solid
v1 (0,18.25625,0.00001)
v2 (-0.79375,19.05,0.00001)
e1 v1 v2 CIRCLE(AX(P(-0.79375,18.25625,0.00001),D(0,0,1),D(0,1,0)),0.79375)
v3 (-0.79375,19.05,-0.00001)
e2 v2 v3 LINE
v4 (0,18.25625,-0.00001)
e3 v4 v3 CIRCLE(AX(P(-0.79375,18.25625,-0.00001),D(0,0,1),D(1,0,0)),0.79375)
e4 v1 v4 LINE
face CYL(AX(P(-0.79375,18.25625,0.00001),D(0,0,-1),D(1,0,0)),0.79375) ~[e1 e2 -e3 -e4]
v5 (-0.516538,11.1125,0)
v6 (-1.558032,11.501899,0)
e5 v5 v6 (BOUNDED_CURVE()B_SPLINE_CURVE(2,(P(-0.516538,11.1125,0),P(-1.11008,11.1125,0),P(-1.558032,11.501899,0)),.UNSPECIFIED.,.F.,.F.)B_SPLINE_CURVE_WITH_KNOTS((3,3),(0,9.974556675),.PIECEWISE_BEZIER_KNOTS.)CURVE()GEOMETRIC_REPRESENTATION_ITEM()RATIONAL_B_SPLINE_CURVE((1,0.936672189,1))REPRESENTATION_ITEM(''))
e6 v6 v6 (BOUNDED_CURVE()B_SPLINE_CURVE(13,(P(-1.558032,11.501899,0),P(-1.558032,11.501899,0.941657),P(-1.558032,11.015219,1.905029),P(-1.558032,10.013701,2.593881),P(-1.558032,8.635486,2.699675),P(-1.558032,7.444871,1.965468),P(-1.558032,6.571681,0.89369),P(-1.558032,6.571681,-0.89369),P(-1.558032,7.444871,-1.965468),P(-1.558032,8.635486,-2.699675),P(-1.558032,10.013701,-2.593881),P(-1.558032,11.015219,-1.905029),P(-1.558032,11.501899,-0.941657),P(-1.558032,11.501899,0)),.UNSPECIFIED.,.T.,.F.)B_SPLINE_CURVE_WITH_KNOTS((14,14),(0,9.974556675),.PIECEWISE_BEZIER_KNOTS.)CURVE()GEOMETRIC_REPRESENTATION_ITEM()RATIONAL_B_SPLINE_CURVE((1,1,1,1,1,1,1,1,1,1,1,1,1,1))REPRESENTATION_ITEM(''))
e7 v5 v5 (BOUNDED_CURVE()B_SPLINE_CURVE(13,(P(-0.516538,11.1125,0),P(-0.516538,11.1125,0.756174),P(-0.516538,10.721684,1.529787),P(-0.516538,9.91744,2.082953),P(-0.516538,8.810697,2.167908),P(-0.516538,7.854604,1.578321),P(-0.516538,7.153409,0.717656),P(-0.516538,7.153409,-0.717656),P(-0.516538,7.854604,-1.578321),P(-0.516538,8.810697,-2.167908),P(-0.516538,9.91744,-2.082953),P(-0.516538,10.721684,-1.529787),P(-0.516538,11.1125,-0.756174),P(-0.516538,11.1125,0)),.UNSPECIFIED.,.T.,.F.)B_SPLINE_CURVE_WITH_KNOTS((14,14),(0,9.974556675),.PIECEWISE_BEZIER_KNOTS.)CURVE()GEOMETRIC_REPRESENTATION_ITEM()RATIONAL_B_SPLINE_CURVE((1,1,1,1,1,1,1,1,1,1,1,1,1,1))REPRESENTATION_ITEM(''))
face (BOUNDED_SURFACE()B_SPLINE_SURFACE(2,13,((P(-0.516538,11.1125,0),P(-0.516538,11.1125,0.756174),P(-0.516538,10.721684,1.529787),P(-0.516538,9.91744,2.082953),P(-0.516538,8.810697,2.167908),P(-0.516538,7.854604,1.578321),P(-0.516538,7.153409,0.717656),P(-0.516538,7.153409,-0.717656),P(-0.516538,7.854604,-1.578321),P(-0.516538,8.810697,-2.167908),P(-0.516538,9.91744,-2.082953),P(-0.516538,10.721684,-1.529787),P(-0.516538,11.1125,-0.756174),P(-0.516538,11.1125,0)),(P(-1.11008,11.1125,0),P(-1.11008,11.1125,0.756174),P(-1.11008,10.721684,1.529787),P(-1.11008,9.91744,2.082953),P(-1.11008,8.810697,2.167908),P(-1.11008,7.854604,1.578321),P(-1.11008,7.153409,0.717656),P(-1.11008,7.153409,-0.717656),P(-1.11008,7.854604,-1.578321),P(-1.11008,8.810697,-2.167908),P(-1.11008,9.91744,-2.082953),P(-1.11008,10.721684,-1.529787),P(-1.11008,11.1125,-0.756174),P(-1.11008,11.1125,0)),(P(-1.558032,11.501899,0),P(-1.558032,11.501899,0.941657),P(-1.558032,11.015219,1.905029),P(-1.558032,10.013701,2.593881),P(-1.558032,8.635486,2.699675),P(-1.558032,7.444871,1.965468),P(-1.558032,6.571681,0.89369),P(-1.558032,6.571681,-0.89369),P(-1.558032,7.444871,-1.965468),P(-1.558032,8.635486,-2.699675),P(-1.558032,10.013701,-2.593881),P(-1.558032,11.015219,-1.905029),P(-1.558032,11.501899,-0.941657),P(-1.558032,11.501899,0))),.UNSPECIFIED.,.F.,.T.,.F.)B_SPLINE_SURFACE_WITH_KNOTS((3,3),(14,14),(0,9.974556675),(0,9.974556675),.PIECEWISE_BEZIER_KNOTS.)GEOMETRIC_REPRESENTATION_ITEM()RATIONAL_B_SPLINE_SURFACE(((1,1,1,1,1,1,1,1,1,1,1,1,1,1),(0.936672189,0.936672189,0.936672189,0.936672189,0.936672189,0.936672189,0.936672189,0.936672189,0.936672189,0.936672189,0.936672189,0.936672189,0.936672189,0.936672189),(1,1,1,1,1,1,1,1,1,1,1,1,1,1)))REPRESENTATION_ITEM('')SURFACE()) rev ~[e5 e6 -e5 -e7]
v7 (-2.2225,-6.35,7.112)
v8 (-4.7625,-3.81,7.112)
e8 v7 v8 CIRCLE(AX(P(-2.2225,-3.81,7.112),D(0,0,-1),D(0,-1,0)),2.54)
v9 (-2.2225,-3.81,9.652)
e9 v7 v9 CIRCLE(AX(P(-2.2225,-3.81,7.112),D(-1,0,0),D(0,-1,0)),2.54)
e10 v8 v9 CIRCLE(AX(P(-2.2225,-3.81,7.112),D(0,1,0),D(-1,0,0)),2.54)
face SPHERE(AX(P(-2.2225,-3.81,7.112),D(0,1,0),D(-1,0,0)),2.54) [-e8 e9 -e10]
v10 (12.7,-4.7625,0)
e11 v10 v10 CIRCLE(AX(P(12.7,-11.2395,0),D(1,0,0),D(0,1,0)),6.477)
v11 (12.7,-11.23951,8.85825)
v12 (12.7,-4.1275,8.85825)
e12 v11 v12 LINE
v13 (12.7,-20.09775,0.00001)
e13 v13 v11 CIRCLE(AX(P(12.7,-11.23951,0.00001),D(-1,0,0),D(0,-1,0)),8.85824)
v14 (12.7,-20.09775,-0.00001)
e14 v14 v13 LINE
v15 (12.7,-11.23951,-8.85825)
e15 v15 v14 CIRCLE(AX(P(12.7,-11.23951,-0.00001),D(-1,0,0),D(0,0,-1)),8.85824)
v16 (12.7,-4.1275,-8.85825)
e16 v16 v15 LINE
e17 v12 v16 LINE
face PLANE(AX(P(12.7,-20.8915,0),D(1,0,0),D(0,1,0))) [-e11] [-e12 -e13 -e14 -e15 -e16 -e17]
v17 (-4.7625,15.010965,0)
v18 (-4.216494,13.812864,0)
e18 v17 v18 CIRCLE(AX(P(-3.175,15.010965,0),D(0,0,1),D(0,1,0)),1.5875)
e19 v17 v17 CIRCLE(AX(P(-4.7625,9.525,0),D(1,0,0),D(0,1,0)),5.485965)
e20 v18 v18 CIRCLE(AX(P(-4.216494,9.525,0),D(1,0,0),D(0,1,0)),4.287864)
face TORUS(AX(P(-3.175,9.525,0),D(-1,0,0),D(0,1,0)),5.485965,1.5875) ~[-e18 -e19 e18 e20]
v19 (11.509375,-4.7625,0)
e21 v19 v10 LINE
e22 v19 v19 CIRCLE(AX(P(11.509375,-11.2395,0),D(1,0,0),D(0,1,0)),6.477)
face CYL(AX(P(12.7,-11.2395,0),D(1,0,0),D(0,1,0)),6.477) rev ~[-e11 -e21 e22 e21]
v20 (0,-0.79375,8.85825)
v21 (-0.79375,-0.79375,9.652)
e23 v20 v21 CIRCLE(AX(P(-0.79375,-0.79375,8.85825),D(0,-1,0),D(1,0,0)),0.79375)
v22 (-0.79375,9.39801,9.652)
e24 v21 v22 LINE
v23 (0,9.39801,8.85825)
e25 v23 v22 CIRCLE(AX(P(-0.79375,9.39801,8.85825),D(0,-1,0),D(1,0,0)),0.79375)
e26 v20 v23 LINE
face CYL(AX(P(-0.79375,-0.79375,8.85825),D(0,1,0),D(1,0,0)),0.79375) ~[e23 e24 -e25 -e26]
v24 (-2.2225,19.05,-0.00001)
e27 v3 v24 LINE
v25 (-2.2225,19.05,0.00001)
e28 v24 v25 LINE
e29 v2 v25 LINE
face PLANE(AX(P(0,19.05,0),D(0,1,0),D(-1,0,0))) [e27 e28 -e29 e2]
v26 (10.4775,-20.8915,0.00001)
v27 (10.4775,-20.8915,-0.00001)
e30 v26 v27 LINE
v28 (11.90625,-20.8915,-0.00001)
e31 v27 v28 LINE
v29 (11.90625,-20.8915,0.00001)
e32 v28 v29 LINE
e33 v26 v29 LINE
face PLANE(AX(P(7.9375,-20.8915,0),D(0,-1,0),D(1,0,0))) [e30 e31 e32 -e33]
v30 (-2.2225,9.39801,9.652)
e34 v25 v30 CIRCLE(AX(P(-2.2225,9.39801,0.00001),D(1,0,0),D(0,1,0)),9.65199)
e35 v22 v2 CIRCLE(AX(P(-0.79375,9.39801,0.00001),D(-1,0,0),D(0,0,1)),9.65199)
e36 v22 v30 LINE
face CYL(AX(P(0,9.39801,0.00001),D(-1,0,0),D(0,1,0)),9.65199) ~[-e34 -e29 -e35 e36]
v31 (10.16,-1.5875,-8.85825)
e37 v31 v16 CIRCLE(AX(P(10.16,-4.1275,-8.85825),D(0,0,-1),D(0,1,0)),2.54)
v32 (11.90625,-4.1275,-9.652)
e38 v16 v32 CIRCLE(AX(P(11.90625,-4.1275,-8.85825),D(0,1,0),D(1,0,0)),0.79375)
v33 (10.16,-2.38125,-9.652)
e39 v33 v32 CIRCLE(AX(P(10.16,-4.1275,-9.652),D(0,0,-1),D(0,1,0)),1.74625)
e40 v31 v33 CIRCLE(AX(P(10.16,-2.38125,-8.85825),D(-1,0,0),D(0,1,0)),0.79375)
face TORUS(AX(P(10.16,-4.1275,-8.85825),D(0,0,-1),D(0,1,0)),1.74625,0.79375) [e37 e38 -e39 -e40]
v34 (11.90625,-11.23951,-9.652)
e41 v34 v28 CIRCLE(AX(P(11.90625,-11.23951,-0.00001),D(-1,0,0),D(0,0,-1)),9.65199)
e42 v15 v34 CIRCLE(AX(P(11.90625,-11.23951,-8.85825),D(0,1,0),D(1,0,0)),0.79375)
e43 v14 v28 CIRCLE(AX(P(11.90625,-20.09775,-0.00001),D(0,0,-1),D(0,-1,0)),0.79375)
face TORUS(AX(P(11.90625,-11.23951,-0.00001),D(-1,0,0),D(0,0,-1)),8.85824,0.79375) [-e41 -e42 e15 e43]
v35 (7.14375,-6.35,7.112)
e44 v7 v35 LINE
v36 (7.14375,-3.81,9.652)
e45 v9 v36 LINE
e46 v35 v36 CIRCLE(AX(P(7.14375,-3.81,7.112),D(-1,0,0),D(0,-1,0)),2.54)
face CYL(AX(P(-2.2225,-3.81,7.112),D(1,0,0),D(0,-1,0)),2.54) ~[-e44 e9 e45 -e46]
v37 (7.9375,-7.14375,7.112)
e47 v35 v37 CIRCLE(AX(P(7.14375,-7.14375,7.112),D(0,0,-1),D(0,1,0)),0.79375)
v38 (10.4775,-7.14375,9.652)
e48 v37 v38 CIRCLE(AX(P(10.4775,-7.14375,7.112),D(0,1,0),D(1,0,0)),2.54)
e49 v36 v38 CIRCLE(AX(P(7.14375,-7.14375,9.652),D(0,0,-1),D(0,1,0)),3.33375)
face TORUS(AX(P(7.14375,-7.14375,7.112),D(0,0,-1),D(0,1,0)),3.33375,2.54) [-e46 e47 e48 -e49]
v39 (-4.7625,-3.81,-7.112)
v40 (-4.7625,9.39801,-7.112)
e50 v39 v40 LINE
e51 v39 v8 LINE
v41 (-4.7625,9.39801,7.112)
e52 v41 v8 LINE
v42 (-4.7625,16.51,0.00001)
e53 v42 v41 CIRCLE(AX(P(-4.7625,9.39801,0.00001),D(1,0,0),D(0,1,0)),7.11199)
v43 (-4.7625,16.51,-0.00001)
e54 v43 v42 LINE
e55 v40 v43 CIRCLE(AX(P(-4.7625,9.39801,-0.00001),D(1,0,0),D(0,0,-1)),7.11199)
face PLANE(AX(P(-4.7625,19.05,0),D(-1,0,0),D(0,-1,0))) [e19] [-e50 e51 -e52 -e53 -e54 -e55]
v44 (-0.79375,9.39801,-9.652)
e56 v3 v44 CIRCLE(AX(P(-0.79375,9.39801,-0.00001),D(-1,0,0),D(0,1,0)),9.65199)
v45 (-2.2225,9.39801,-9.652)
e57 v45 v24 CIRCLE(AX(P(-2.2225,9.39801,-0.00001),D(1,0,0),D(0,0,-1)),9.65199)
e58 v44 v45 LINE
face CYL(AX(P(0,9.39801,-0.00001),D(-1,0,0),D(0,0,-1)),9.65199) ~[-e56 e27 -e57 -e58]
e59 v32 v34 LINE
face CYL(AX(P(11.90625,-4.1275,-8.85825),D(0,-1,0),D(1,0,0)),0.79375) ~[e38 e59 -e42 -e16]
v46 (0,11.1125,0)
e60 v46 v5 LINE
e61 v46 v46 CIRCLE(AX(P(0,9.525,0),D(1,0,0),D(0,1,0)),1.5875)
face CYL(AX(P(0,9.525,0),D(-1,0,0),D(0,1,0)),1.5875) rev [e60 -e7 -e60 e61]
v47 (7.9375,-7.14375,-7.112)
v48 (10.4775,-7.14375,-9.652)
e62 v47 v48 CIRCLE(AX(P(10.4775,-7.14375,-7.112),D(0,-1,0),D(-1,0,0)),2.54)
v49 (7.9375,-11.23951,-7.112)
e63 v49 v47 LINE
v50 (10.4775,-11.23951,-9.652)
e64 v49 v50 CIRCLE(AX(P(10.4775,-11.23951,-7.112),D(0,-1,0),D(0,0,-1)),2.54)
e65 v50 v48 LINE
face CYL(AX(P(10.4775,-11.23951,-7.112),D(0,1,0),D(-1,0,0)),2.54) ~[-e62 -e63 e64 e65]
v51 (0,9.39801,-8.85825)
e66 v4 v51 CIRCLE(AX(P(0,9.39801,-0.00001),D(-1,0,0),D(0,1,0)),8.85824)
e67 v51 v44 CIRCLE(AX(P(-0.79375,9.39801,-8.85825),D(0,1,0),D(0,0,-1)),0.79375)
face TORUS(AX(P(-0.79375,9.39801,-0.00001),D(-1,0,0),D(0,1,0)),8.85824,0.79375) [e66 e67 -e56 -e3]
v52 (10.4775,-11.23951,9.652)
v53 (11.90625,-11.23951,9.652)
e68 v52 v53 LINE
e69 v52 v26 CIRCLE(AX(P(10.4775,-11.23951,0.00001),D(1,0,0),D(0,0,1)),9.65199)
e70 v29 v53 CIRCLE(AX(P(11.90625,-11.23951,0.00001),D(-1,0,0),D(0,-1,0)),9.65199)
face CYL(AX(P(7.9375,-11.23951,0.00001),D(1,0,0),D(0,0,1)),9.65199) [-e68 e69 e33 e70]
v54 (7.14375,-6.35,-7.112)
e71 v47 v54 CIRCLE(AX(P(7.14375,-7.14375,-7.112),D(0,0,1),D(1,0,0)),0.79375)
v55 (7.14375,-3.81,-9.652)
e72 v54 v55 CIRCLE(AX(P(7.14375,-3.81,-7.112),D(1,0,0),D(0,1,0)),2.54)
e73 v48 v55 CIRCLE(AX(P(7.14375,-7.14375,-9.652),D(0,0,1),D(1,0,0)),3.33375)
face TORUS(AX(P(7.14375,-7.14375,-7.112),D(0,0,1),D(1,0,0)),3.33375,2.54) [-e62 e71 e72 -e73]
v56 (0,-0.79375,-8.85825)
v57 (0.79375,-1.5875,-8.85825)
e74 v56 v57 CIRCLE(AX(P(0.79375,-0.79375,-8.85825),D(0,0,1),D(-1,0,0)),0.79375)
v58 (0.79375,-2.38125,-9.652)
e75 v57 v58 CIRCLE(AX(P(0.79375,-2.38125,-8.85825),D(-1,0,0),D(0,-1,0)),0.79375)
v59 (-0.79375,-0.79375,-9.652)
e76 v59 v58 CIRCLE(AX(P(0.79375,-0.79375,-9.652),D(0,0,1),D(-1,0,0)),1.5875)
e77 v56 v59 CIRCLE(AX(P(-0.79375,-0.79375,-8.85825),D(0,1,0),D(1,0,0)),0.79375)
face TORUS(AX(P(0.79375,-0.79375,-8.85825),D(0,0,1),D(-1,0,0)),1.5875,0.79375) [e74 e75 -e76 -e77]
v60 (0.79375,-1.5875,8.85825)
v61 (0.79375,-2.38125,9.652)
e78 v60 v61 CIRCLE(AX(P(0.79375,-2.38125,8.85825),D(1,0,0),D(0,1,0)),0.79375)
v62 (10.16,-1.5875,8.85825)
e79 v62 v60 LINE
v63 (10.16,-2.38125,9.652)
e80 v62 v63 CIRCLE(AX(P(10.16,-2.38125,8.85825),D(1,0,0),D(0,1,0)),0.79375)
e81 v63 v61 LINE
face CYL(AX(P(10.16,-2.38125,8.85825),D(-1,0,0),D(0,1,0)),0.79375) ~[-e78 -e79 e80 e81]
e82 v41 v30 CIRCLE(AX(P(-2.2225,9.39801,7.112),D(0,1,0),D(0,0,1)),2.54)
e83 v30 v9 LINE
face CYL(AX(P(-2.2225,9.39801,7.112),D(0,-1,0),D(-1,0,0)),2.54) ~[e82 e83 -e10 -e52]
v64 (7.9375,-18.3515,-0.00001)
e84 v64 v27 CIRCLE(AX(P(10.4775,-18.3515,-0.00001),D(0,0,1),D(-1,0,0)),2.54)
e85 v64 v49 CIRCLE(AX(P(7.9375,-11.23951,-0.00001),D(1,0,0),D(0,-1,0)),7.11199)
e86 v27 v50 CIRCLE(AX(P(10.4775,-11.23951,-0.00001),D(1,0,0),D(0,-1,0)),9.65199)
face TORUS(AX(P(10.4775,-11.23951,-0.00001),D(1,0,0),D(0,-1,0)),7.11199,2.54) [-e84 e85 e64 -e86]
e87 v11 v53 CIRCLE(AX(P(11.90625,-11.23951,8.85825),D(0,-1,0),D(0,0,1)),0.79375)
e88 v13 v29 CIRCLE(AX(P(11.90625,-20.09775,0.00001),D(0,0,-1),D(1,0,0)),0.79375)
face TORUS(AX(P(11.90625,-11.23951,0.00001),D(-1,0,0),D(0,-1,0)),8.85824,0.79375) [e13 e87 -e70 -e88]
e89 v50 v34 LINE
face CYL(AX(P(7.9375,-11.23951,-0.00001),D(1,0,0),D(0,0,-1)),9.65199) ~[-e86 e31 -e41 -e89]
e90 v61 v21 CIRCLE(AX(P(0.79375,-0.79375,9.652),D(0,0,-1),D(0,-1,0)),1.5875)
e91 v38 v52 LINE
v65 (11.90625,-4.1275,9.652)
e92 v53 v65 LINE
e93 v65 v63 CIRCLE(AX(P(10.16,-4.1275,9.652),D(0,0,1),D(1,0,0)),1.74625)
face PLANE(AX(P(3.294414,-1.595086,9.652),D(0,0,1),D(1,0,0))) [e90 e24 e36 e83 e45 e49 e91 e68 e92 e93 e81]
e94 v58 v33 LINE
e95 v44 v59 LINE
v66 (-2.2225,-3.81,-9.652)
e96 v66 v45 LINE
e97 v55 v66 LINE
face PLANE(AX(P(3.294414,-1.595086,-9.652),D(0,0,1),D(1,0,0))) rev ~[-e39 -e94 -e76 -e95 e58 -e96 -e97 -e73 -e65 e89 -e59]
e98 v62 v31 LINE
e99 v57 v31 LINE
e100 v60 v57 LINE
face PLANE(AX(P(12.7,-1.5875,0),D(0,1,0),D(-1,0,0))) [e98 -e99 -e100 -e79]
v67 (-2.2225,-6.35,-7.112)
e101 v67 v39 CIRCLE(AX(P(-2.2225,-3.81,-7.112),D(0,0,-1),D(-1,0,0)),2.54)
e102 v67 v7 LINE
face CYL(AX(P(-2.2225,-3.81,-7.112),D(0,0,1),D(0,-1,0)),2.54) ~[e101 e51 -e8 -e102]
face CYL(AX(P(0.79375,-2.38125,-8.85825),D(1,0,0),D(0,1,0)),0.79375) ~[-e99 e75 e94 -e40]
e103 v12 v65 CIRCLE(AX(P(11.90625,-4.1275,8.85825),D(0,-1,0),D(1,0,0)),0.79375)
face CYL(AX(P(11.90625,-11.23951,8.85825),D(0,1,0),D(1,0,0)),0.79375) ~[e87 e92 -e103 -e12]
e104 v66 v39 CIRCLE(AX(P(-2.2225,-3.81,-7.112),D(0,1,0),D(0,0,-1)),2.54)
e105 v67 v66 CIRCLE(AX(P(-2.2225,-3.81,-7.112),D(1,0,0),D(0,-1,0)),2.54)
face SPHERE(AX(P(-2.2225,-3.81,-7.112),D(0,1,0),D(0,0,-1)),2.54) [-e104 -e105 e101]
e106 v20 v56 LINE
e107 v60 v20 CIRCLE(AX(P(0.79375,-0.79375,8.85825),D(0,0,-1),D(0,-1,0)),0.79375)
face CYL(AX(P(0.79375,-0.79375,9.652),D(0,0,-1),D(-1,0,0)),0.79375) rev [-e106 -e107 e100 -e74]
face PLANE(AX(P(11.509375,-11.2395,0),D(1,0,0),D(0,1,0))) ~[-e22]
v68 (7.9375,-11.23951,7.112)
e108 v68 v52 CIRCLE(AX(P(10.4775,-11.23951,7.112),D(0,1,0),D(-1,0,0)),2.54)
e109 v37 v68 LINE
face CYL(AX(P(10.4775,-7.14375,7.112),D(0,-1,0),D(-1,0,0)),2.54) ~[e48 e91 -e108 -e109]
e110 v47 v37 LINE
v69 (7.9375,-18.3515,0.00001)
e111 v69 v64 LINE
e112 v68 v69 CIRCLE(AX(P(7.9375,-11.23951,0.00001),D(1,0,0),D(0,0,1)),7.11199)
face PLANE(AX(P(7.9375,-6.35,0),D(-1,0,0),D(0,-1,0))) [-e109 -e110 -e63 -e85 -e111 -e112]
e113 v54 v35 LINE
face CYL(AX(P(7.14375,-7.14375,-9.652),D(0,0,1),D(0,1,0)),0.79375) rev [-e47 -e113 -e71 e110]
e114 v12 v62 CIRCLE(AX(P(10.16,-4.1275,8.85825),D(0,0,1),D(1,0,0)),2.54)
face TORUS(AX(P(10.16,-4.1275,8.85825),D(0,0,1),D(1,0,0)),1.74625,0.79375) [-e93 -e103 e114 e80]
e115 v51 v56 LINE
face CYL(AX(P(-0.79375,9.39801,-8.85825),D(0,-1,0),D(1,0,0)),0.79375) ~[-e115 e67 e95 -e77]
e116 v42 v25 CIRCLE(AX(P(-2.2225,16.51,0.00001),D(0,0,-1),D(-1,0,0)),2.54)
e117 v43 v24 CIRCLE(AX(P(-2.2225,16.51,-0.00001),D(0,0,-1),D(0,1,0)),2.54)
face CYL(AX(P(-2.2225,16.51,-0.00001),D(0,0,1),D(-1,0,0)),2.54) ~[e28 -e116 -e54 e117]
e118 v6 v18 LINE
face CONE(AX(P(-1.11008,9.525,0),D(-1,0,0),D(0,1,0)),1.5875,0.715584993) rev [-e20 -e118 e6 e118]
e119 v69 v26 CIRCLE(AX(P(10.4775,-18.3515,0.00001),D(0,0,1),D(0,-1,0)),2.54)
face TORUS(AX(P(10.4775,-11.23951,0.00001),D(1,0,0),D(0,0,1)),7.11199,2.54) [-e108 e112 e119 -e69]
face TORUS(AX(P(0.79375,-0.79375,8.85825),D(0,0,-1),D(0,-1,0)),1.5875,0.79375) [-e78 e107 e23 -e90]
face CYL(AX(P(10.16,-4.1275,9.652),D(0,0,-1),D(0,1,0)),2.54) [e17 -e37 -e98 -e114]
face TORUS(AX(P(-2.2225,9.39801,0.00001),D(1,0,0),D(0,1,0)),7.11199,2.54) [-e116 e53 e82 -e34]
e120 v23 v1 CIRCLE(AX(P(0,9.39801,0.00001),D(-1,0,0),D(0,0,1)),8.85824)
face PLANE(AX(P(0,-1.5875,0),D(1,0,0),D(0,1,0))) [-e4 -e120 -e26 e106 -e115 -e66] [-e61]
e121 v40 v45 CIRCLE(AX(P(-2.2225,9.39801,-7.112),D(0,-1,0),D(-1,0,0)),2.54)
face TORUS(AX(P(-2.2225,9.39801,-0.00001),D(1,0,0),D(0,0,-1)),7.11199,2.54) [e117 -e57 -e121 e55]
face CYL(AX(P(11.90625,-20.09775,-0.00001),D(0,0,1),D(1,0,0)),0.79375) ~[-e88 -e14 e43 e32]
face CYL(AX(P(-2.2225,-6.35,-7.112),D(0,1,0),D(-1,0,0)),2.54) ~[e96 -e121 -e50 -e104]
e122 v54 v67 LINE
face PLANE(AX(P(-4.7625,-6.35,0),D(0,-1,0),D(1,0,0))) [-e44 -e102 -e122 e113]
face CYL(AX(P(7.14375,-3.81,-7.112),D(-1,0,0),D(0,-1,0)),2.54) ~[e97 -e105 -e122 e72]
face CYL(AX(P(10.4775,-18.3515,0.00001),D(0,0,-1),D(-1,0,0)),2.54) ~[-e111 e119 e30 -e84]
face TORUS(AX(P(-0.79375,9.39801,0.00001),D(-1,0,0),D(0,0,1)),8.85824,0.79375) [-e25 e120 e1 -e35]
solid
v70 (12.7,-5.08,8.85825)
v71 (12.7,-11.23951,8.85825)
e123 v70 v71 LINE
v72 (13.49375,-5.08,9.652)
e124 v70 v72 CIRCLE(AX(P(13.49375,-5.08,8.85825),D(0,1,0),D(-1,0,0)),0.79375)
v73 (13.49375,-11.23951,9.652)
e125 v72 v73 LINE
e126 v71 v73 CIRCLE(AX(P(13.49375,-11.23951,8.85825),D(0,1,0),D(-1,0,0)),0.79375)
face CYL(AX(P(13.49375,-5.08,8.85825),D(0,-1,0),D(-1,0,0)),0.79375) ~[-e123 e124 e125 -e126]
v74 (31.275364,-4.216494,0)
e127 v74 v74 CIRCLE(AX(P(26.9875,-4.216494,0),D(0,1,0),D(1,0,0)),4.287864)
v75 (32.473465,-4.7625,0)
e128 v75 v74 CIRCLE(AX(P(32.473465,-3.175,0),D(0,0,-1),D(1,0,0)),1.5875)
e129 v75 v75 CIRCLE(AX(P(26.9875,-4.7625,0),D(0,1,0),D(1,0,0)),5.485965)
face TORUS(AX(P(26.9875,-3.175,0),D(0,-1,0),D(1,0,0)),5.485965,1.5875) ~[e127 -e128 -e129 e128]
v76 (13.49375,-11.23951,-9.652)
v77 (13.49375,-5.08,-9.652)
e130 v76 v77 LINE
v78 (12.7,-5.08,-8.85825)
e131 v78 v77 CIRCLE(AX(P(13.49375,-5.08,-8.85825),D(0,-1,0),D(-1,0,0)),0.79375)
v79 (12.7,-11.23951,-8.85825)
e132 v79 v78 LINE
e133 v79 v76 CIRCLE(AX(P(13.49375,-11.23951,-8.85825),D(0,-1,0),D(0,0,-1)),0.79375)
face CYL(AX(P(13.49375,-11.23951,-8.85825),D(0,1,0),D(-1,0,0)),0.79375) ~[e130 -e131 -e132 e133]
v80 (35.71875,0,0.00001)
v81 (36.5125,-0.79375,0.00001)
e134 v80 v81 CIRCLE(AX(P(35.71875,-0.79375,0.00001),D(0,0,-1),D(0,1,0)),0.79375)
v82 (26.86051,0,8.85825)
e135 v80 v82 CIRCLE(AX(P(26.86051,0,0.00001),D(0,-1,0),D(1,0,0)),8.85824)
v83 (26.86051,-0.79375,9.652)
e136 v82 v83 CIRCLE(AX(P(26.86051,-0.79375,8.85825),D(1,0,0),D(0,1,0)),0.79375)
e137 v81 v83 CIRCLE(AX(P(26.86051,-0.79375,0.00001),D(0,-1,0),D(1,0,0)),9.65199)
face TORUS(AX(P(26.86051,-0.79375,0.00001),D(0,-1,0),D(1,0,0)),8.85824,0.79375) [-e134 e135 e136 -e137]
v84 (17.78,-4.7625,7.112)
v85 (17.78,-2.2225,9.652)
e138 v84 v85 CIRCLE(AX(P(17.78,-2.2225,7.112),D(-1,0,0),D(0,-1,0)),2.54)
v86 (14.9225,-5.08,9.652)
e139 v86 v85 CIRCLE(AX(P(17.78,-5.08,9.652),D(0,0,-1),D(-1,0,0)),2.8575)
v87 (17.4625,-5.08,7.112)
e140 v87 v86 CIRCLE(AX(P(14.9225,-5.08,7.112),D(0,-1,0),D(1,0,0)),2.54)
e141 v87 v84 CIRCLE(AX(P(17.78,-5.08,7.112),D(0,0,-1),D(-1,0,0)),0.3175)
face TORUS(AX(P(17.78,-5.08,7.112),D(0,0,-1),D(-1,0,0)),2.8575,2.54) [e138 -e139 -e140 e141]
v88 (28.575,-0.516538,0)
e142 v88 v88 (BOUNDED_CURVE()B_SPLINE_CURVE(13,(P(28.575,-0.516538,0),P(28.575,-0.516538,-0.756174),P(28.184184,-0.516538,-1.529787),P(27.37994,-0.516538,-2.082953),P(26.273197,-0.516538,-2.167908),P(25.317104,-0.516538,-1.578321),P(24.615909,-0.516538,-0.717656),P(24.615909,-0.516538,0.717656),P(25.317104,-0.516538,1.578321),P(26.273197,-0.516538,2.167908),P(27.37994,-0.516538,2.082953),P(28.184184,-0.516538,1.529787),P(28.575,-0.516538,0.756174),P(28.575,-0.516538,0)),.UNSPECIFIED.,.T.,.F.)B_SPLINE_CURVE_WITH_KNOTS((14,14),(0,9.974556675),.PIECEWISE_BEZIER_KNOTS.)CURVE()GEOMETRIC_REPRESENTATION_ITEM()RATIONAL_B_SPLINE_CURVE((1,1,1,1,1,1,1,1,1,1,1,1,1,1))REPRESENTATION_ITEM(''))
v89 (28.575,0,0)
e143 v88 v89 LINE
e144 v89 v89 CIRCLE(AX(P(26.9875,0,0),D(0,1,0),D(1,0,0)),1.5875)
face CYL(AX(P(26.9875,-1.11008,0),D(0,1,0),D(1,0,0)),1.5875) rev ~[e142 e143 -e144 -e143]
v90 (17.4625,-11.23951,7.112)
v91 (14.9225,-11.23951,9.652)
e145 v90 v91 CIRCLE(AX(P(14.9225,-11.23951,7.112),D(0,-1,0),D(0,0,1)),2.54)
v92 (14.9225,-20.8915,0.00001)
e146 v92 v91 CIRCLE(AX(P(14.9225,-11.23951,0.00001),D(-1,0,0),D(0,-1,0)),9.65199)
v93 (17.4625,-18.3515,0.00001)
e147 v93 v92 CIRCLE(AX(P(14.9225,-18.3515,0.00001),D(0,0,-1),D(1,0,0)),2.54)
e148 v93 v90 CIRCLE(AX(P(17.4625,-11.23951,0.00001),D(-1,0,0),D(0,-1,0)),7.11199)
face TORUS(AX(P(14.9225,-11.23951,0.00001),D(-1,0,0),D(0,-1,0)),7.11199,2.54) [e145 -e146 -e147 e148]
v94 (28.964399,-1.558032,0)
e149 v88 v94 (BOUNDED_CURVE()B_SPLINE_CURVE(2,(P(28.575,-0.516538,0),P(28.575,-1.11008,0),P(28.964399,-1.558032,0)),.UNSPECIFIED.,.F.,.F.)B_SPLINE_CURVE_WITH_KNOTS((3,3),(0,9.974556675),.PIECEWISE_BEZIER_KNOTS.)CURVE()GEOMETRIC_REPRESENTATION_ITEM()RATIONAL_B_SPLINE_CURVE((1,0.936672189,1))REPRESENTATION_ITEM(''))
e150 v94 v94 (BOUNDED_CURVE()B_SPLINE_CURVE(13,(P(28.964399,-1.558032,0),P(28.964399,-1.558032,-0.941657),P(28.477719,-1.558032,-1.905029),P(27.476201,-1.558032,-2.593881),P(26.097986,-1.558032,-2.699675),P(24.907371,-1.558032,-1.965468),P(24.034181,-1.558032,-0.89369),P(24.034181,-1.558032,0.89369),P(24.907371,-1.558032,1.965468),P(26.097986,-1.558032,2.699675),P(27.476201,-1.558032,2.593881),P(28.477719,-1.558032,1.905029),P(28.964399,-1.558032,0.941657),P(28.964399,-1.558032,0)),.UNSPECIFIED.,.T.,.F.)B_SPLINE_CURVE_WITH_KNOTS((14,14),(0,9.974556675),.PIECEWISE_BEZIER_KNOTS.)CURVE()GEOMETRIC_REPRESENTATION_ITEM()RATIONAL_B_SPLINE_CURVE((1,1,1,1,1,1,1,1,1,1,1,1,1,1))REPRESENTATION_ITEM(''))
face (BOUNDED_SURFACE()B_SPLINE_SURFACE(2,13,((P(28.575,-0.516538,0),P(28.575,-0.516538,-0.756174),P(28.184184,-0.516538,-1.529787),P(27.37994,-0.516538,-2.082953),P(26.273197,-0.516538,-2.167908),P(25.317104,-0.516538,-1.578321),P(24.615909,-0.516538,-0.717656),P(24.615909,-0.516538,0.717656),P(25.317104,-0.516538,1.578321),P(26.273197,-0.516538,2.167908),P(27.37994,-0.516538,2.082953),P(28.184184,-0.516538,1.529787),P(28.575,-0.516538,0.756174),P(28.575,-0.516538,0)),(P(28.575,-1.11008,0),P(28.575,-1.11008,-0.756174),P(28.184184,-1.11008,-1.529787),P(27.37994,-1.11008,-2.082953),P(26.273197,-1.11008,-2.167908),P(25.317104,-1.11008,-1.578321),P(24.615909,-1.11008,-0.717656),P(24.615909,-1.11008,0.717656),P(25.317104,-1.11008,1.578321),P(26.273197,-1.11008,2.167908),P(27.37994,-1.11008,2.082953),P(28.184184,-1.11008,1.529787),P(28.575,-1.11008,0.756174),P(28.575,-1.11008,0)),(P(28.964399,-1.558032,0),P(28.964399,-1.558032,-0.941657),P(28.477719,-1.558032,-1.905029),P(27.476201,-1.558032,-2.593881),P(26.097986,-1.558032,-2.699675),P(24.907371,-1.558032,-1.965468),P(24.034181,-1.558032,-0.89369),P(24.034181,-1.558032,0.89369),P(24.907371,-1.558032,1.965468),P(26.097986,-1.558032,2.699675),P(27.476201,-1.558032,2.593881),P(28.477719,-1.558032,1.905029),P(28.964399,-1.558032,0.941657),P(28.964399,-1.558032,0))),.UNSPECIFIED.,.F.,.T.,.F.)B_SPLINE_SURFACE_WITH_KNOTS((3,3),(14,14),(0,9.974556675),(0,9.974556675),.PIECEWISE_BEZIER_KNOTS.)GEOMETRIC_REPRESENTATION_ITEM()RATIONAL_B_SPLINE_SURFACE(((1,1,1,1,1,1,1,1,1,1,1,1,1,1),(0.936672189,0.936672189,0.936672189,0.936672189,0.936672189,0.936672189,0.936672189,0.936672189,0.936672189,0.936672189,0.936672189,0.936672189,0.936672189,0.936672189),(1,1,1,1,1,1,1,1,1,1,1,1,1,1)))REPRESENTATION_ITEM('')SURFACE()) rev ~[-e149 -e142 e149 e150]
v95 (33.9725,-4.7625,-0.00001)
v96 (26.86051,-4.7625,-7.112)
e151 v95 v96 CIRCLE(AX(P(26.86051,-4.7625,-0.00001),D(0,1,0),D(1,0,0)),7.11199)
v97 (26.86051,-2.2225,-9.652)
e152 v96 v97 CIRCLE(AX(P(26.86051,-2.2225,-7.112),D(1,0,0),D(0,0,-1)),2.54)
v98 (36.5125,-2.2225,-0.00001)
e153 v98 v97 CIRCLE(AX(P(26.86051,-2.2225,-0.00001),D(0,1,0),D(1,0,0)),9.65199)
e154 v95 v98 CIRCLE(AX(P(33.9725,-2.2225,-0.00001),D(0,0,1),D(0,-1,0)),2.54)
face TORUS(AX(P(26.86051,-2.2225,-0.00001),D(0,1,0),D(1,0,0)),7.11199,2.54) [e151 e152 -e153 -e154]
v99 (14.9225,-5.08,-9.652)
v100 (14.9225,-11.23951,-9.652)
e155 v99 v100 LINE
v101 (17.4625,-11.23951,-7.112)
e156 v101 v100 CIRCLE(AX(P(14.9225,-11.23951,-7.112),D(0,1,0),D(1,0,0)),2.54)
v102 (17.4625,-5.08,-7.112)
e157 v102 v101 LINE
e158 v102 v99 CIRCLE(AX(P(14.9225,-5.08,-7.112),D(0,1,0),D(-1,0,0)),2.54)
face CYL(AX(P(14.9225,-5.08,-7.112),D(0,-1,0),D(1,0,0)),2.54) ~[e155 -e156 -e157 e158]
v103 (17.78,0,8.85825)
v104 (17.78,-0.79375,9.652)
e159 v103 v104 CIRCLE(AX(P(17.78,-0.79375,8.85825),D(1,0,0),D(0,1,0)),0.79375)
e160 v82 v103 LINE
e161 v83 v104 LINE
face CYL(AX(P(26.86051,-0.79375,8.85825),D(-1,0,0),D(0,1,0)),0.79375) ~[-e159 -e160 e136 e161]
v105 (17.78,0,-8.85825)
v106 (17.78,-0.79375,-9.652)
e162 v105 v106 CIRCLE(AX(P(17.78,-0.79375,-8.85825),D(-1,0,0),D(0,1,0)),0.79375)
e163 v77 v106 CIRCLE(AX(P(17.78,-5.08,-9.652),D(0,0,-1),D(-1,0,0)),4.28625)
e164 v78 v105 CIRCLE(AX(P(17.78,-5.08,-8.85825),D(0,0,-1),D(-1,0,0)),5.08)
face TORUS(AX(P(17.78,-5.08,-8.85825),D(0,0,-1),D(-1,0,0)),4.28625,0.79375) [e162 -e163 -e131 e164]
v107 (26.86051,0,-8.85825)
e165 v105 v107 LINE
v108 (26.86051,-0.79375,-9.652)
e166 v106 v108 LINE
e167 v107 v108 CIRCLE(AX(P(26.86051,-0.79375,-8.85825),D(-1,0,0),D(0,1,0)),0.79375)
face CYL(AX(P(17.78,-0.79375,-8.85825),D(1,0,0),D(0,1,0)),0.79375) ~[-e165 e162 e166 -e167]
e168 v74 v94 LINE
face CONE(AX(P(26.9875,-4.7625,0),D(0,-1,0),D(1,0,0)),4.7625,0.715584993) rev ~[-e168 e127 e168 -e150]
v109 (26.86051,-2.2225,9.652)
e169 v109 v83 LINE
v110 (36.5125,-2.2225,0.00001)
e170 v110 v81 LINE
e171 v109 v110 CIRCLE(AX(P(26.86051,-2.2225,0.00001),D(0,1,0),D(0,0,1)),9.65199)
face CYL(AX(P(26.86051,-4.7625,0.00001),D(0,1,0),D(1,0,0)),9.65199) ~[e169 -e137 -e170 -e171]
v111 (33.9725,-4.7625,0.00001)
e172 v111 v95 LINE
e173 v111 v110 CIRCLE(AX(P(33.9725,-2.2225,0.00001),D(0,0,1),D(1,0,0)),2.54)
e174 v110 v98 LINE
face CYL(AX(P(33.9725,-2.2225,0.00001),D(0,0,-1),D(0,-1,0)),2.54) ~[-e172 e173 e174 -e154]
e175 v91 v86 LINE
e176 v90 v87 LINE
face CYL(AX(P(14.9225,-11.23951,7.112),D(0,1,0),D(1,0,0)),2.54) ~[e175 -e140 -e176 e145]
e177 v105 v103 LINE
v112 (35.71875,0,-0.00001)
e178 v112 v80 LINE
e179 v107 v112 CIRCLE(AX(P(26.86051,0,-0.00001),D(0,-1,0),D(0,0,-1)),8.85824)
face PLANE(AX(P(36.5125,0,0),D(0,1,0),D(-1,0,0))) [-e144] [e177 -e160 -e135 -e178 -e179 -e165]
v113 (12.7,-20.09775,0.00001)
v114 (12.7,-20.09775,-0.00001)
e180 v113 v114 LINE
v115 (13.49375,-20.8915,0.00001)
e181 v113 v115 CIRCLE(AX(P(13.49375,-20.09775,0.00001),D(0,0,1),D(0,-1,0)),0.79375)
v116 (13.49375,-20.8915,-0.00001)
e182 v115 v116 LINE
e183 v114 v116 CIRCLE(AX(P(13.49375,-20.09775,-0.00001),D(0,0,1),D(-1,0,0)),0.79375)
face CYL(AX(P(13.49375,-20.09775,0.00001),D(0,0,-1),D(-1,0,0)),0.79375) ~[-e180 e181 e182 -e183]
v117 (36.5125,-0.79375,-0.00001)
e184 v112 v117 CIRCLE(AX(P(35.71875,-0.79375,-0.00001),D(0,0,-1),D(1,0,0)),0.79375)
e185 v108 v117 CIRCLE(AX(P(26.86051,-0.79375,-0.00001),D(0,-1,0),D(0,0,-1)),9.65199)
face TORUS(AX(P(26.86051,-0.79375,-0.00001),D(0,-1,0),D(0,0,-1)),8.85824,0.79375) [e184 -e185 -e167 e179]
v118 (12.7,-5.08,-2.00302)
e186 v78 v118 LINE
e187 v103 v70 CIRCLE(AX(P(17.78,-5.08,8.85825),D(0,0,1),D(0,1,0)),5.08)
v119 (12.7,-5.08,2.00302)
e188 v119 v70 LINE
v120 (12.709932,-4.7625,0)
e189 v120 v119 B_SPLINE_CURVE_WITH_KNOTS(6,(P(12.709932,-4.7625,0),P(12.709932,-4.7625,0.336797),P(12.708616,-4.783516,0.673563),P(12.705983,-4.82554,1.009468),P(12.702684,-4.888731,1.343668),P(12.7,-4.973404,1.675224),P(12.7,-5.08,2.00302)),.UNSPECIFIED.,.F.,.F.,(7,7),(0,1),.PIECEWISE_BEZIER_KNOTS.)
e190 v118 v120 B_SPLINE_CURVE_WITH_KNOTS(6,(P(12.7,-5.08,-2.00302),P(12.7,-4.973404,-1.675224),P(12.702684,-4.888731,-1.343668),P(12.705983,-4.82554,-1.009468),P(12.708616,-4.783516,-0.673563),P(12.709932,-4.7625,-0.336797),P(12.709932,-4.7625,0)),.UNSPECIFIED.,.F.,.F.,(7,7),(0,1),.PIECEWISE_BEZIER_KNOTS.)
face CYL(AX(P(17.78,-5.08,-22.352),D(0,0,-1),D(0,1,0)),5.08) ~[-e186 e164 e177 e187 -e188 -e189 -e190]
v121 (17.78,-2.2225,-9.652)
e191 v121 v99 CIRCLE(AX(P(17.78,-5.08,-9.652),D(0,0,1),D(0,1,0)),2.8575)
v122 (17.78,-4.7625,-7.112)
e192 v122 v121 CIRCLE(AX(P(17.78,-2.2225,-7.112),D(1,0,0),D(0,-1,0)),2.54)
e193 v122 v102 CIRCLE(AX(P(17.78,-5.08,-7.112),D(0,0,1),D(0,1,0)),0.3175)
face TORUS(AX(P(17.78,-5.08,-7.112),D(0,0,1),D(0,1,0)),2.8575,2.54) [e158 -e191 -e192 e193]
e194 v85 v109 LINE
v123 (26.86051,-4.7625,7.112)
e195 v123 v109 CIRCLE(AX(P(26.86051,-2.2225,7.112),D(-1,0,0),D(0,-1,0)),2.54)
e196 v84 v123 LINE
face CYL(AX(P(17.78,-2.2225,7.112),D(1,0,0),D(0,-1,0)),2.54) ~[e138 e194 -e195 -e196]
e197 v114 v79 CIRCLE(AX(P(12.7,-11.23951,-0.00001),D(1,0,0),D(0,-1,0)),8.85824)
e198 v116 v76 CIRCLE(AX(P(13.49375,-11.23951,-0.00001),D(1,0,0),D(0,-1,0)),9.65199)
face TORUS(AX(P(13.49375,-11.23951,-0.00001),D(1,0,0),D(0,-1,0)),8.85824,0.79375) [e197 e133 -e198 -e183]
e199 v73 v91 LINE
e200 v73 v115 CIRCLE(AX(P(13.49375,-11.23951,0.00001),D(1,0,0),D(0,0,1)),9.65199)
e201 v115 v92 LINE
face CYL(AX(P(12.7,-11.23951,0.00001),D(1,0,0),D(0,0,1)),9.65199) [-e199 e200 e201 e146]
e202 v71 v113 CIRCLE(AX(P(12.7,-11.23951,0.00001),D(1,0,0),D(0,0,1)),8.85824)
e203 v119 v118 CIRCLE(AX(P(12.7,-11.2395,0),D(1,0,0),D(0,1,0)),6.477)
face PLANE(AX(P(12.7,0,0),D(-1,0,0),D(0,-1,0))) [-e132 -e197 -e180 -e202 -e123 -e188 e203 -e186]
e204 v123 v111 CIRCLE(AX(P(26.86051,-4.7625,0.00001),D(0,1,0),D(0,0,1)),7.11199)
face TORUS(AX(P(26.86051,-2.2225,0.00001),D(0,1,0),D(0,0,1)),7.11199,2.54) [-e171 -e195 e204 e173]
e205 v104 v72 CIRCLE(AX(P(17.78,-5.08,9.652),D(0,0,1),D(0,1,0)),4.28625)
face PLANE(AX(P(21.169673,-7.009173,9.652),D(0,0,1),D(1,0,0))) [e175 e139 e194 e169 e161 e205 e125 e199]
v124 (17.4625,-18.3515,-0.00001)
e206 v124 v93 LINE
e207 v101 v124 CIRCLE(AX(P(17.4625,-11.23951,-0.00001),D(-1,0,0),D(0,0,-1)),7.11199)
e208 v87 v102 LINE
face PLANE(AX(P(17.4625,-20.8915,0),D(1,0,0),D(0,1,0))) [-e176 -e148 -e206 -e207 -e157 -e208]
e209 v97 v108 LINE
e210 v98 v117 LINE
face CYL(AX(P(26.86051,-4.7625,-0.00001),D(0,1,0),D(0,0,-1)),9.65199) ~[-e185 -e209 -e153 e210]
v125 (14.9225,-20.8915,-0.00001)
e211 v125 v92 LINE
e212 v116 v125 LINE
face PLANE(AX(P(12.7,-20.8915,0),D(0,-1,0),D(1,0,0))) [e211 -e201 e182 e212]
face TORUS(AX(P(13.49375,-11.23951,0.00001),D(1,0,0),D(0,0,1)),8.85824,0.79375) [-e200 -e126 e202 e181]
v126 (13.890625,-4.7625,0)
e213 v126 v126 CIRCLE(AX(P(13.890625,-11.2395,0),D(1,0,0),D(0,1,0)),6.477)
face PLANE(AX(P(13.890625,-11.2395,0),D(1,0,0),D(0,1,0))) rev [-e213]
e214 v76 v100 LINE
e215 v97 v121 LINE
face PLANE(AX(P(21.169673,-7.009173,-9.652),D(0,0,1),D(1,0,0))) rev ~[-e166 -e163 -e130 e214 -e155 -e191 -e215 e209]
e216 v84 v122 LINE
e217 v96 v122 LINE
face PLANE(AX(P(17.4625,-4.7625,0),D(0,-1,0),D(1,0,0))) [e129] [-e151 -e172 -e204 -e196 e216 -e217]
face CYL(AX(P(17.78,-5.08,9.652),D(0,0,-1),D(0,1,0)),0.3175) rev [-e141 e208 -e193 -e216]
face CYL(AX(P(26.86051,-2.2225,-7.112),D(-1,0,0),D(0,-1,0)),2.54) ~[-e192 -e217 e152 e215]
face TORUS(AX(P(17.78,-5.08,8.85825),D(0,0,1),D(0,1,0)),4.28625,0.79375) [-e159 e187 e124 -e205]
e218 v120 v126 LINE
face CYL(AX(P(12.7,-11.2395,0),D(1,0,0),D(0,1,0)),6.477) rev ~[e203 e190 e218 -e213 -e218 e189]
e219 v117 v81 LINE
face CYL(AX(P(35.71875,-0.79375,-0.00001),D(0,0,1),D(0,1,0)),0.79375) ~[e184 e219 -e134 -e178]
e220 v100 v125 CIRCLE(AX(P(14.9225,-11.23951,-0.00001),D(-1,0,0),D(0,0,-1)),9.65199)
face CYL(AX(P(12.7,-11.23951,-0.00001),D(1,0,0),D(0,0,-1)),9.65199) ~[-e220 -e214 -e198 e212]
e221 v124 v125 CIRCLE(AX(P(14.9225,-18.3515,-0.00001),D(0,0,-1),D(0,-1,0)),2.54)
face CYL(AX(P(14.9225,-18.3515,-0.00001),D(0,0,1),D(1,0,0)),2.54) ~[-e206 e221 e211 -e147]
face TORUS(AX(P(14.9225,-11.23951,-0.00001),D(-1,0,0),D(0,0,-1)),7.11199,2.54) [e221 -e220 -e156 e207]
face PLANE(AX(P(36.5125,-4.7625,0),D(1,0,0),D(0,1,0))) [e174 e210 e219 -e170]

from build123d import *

# Parameters (mm, degrees)
F2_DEPTH     = 9.652
F3_DEPTH     = 9.652
F4_W         = 2.38125
F4_H         = 6.477
F10_R        = 9.65199
F10_2_R      = 9.65199
F11_R        = 9.65199
F11_2_R      = 9.65199
F12_T1_DEPTH = 44.704
F13_R        = 0.3175
F14_R        = 2.54
F15_R        = 2.54
F15_2_R      = 2.54
F16_R        = 0.79375
F17_R        = 0.79375
F17_2_R      = 0.79375
F18_R        = 1.5875
F18_2_R      = 1.5875
F19_R        = 2.54


# Not quite as in the source:
# - a fillet or chamfer that OpenCascade refuses, or shapes differently, is made with other operations: its cross-section is extruded or revolved along the edge and cut away or added
# - a fillet or chamfer is up to 0.001 mm smaller than in the source, because OpenCascade refuses the exact size


with BuildPart() as f2:
    # F0 (on Top) → F2 (new body, symmetric)
    with BuildSketch(Plane.XY):
        Polygon((0, -1.5875), (0, 19.05), (-4.7625, 19.05), (-4.7625, -6.35), (7.9375, -6.35), (7.9375, -20.8915), (12.7, -20.8915), (12.7, -1.5875), align=None)
    extrude(amount=F2_DEPTH, both=True)


with BuildPart() as f3:
    # F1 (on Top) → F3 (new body, symmetric)
    with BuildSketch(Plane.XY):
        Polygon((36.5125, 0), (12.7, 0), (12.7, -20.8915), (17.4625, -20.8915), (17.4625, -4.7625), (36.5125, -4.7625), align=None)
    extrude(amount=F3_DEPTH, both=True)


with BuildPart() as f5_tool:
    # F4 (on Top) → F5 (revolve)
    with BuildSketch(Plane.XY):
        with Locations((12.7, -8.001)):
            Rectangle(F4_W, F4_H)
    revolve(axis=Axis((19.7726818566, -11.2395, 0), (1, 0, 0)))


with BuildPart() as f2_1:
    add(f2.part)

    # F5: cut by f5_tool
    add(f5_tool.part, mode=Mode.SUBTRACT)

    # F6 (on Top) → F7 (revolve, cut)
    with BuildSketch(Plane.XY):
        Polygon((-1.1100803071, 11.1125), (-4.7625, 14.2875), (-4.7625, 9.525), (0, 9.525), (0, 11.1125), align=None)
    revolve(axis=Axis((4.3882697649, 9.525, 0), (1, 0, 0)), mode=Mode.SUBTRACT)

    # F10 (radius 9.652 in the source; OpenCascade refuses exactly that, so slightly less here)
    f10_edges = [f2_1.edges().sort_by_distance(p)[0] for p in [
        (10.31875, -20.8915, 9.652),
        (10.31875, -20.8915, -9.652),
    ]]
    fillet(f10_edges, radius=F10_R)

    # F11 (radius 9.652 in the source; OpenCascade refuses exactly that, so slightly less here)
    f11_edges = [f2_1.edges().sort_by_distance(p)[0] for p in [
        (-2.38125, 19.05, 9.652),
        (-2.38125, 19.05, -9.652),
    ]]
    fillet(f11_edges, radius=F11_R)

    # F14
    f14_edges = [f2_1.edges().sort_by_distance(p)[0] for p in [
        (12.7, -1.5875, 0),
    ]]
    fillet(f14_edges, radius=F14_R)

    # F15
    f15_edges = [f2_1.edges().sort_by_distance(p)[0] for p in [
        (-4.7625, 1.524005, 9.652),
    ]]
    fillet(f15_edges, radius=F15_R)

    # F16
    f16_edges = [f2_1.edges().sort_by_distance(p)[0] for p in [
        (0, -1.5875, 0),
        (7.9375, -6.35, 0),
    ]]
    fillet(f16_edges, radius=F16_R)

    # F17
    f17_edges = [f2_1.edges().sort_by_distance(p)[0] for p in [
        (0, 4.30213, 9.652),
        (0, 4.30213, -9.652),
        (0.232484, -1.355016, -9.652),
        (5.476875, -1.5875, -9.652),
        (11.956051, -2.331449, -9.652),
        (12.7, -7.683505, -9.652),
        (0, 16.222998, -6.824998),
        (0, 19.05, 0),
        (0, 16.222998, 6.824998),
        (0.232484, -1.355016, 9.652),
        (5.476875, -1.5875, 9.652),
        (11.956051, -2.331449, 9.652),
        (12.7, -18.064498, -6.824998),
        (12.7, -7.683505, 9.652),
        (12.7, -20.8915, 0),
        (12.7, -18.064498, 6.824998),
    ]]
    fillet(f17_edges, radius=F17_R)

    # F18
    f18_edges = [f2_1.edges().sort_by_distance(p)[0] for p in [
        (-4.7625, 4.7625, 0),
        (-1.11008, 7.9375, 0),
    ]]
    fillet(f18_edges, radius=F18_R)

    # F19
    f19_edges = [f2_1.edges().sort_by_distance(p)[0] for p in [
        (2.460625, -6.35, 9.652),
        (-4.7625, -6.35, 0),
        (2.460625, -6.35, -9.652),
        (-4.018551, -6.35, -8.908051),
        (-4.018551, -6.35, 8.908051),
        (7.705016, -6.582484, -9.652),
        (7.9375, -9.19163, -9.652),
        (7.705016, -6.582484, 9.652),
        (7.9375, -9.19163, 9.652),
        (7.9375, -18.064498, -6.824998),
        (7.9375, -20.8915, 0),
        (7.9375, -18.064498, 6.824998),
    ]]
    fillet(f19_edges, radius=F19_R)


with BuildPart() as f3_1:
    add(f3.part)

    # F5: cut by f5_tool
    add(f5_tool.part, mode=Mode.SUBTRACT)

    # F8 (on Top) → F9 (revolve, cut)
    with BuildSketch(Plane.XY):
        Polygon((28.575, -1.1100803071), (28.575, 0), (26.9875, 0), (26.9875, -4.7625), (31.75, -4.7625), align=None)
    revolve(axis=Axis((26.9875, 5.8666377451, 0), (0, 1, 0)), mode=Mode.SUBTRACT)

    # F10#2 (radius 9.652 in the source; OpenCascade refuses exactly that, so slightly less here)
    f10_2_edges = [f3_1.edges().sort_by_distance(p)[0] for p in [
        (15.08125, -20.8915, 9.652),
        (15.08125, -20.8915, -9.652),
    ]]
    fillet(f10_2_edges, radius=F10_2_R)

    # F11#2 (radius 9.652 in the source; OpenCascade refuses exactly that, so slightly less here)
    f11_2_edges = [f3_1.edges().sort_by_distance(p)[0] for p in [
        (36.5125, -2.38125, 9.652),
        (36.5125, -2.38125, -9.652),
    ]]
    fillet(f11_2_edges, radius=F11_2_R)

    # F12: fillet of radius 5.08 on 1 edges, made by hand

    # F12_s2 → F12_t1 (cut)
    with BuildSketch(Plane.XY.offset(-22.352)):
        with BuildLine():
            ThreePointArc((17.78, 0), (14.1878975516, -1.4878975516), (12.7, -5.08))
            Line((12.7, -5.08), (12.7, 0))
            Line((12.7, 0), (17.78, 0))
        make_face()
    extrude(amount=F12_T1_DEPTH, mode=Mode.SUBTRACT)

    # F13
    f13_edges = [f3_1.edges().sort_by_distance(p)[0] for p in [
        (17.4625, -4.7625, 0),
    ]]
    fillet(f13_edges, radius=F13_R)

    # F15#2
    f15_2_edges = [f3_1.edges().sort_by_distance(p)[0] for p in [
        (22.320255, -4.7625, 9.652),
    ]]
    fillet(f15_2_edges, radius=F15_2_R)

    # F17#2
    f17_2_edges = [f3_1.edges().sort_by_distance(p)[0] for p in [
        (22.320255, 0, 9.652),
        (12.7, -18.064498, -6.824998),
        (12.7, -20.8915, 0),
        (12.7, -18.064498, 6.824998),
        (22.320255, 0, -9.652),
        (14.187898, -1.487898, -9.652),
        (12.7, -8.159755, -9.652),
        (33.685498, 0, -6.824998),
        (36.5125, 0, 0),
        (33.685498, 0, 6.824998),
        (14.187898, -1.487898, 9.652),
        (12.7, -8.159755, 9.652),
    ]]
    fillet(f17_2_edges, radius=F17_2_R)

    # F18#2
    f18_2_edges = [f3_1.edges().sort_by_distance(p)[0] for p in [
        (22.225, -4.7625, 0),
        (25.4, -1.11008, 0),
    ]]
    fillet(f18_2_edges, radius=F18_2_R)


solid = Compound([f2_1.part, f3_1.part])
